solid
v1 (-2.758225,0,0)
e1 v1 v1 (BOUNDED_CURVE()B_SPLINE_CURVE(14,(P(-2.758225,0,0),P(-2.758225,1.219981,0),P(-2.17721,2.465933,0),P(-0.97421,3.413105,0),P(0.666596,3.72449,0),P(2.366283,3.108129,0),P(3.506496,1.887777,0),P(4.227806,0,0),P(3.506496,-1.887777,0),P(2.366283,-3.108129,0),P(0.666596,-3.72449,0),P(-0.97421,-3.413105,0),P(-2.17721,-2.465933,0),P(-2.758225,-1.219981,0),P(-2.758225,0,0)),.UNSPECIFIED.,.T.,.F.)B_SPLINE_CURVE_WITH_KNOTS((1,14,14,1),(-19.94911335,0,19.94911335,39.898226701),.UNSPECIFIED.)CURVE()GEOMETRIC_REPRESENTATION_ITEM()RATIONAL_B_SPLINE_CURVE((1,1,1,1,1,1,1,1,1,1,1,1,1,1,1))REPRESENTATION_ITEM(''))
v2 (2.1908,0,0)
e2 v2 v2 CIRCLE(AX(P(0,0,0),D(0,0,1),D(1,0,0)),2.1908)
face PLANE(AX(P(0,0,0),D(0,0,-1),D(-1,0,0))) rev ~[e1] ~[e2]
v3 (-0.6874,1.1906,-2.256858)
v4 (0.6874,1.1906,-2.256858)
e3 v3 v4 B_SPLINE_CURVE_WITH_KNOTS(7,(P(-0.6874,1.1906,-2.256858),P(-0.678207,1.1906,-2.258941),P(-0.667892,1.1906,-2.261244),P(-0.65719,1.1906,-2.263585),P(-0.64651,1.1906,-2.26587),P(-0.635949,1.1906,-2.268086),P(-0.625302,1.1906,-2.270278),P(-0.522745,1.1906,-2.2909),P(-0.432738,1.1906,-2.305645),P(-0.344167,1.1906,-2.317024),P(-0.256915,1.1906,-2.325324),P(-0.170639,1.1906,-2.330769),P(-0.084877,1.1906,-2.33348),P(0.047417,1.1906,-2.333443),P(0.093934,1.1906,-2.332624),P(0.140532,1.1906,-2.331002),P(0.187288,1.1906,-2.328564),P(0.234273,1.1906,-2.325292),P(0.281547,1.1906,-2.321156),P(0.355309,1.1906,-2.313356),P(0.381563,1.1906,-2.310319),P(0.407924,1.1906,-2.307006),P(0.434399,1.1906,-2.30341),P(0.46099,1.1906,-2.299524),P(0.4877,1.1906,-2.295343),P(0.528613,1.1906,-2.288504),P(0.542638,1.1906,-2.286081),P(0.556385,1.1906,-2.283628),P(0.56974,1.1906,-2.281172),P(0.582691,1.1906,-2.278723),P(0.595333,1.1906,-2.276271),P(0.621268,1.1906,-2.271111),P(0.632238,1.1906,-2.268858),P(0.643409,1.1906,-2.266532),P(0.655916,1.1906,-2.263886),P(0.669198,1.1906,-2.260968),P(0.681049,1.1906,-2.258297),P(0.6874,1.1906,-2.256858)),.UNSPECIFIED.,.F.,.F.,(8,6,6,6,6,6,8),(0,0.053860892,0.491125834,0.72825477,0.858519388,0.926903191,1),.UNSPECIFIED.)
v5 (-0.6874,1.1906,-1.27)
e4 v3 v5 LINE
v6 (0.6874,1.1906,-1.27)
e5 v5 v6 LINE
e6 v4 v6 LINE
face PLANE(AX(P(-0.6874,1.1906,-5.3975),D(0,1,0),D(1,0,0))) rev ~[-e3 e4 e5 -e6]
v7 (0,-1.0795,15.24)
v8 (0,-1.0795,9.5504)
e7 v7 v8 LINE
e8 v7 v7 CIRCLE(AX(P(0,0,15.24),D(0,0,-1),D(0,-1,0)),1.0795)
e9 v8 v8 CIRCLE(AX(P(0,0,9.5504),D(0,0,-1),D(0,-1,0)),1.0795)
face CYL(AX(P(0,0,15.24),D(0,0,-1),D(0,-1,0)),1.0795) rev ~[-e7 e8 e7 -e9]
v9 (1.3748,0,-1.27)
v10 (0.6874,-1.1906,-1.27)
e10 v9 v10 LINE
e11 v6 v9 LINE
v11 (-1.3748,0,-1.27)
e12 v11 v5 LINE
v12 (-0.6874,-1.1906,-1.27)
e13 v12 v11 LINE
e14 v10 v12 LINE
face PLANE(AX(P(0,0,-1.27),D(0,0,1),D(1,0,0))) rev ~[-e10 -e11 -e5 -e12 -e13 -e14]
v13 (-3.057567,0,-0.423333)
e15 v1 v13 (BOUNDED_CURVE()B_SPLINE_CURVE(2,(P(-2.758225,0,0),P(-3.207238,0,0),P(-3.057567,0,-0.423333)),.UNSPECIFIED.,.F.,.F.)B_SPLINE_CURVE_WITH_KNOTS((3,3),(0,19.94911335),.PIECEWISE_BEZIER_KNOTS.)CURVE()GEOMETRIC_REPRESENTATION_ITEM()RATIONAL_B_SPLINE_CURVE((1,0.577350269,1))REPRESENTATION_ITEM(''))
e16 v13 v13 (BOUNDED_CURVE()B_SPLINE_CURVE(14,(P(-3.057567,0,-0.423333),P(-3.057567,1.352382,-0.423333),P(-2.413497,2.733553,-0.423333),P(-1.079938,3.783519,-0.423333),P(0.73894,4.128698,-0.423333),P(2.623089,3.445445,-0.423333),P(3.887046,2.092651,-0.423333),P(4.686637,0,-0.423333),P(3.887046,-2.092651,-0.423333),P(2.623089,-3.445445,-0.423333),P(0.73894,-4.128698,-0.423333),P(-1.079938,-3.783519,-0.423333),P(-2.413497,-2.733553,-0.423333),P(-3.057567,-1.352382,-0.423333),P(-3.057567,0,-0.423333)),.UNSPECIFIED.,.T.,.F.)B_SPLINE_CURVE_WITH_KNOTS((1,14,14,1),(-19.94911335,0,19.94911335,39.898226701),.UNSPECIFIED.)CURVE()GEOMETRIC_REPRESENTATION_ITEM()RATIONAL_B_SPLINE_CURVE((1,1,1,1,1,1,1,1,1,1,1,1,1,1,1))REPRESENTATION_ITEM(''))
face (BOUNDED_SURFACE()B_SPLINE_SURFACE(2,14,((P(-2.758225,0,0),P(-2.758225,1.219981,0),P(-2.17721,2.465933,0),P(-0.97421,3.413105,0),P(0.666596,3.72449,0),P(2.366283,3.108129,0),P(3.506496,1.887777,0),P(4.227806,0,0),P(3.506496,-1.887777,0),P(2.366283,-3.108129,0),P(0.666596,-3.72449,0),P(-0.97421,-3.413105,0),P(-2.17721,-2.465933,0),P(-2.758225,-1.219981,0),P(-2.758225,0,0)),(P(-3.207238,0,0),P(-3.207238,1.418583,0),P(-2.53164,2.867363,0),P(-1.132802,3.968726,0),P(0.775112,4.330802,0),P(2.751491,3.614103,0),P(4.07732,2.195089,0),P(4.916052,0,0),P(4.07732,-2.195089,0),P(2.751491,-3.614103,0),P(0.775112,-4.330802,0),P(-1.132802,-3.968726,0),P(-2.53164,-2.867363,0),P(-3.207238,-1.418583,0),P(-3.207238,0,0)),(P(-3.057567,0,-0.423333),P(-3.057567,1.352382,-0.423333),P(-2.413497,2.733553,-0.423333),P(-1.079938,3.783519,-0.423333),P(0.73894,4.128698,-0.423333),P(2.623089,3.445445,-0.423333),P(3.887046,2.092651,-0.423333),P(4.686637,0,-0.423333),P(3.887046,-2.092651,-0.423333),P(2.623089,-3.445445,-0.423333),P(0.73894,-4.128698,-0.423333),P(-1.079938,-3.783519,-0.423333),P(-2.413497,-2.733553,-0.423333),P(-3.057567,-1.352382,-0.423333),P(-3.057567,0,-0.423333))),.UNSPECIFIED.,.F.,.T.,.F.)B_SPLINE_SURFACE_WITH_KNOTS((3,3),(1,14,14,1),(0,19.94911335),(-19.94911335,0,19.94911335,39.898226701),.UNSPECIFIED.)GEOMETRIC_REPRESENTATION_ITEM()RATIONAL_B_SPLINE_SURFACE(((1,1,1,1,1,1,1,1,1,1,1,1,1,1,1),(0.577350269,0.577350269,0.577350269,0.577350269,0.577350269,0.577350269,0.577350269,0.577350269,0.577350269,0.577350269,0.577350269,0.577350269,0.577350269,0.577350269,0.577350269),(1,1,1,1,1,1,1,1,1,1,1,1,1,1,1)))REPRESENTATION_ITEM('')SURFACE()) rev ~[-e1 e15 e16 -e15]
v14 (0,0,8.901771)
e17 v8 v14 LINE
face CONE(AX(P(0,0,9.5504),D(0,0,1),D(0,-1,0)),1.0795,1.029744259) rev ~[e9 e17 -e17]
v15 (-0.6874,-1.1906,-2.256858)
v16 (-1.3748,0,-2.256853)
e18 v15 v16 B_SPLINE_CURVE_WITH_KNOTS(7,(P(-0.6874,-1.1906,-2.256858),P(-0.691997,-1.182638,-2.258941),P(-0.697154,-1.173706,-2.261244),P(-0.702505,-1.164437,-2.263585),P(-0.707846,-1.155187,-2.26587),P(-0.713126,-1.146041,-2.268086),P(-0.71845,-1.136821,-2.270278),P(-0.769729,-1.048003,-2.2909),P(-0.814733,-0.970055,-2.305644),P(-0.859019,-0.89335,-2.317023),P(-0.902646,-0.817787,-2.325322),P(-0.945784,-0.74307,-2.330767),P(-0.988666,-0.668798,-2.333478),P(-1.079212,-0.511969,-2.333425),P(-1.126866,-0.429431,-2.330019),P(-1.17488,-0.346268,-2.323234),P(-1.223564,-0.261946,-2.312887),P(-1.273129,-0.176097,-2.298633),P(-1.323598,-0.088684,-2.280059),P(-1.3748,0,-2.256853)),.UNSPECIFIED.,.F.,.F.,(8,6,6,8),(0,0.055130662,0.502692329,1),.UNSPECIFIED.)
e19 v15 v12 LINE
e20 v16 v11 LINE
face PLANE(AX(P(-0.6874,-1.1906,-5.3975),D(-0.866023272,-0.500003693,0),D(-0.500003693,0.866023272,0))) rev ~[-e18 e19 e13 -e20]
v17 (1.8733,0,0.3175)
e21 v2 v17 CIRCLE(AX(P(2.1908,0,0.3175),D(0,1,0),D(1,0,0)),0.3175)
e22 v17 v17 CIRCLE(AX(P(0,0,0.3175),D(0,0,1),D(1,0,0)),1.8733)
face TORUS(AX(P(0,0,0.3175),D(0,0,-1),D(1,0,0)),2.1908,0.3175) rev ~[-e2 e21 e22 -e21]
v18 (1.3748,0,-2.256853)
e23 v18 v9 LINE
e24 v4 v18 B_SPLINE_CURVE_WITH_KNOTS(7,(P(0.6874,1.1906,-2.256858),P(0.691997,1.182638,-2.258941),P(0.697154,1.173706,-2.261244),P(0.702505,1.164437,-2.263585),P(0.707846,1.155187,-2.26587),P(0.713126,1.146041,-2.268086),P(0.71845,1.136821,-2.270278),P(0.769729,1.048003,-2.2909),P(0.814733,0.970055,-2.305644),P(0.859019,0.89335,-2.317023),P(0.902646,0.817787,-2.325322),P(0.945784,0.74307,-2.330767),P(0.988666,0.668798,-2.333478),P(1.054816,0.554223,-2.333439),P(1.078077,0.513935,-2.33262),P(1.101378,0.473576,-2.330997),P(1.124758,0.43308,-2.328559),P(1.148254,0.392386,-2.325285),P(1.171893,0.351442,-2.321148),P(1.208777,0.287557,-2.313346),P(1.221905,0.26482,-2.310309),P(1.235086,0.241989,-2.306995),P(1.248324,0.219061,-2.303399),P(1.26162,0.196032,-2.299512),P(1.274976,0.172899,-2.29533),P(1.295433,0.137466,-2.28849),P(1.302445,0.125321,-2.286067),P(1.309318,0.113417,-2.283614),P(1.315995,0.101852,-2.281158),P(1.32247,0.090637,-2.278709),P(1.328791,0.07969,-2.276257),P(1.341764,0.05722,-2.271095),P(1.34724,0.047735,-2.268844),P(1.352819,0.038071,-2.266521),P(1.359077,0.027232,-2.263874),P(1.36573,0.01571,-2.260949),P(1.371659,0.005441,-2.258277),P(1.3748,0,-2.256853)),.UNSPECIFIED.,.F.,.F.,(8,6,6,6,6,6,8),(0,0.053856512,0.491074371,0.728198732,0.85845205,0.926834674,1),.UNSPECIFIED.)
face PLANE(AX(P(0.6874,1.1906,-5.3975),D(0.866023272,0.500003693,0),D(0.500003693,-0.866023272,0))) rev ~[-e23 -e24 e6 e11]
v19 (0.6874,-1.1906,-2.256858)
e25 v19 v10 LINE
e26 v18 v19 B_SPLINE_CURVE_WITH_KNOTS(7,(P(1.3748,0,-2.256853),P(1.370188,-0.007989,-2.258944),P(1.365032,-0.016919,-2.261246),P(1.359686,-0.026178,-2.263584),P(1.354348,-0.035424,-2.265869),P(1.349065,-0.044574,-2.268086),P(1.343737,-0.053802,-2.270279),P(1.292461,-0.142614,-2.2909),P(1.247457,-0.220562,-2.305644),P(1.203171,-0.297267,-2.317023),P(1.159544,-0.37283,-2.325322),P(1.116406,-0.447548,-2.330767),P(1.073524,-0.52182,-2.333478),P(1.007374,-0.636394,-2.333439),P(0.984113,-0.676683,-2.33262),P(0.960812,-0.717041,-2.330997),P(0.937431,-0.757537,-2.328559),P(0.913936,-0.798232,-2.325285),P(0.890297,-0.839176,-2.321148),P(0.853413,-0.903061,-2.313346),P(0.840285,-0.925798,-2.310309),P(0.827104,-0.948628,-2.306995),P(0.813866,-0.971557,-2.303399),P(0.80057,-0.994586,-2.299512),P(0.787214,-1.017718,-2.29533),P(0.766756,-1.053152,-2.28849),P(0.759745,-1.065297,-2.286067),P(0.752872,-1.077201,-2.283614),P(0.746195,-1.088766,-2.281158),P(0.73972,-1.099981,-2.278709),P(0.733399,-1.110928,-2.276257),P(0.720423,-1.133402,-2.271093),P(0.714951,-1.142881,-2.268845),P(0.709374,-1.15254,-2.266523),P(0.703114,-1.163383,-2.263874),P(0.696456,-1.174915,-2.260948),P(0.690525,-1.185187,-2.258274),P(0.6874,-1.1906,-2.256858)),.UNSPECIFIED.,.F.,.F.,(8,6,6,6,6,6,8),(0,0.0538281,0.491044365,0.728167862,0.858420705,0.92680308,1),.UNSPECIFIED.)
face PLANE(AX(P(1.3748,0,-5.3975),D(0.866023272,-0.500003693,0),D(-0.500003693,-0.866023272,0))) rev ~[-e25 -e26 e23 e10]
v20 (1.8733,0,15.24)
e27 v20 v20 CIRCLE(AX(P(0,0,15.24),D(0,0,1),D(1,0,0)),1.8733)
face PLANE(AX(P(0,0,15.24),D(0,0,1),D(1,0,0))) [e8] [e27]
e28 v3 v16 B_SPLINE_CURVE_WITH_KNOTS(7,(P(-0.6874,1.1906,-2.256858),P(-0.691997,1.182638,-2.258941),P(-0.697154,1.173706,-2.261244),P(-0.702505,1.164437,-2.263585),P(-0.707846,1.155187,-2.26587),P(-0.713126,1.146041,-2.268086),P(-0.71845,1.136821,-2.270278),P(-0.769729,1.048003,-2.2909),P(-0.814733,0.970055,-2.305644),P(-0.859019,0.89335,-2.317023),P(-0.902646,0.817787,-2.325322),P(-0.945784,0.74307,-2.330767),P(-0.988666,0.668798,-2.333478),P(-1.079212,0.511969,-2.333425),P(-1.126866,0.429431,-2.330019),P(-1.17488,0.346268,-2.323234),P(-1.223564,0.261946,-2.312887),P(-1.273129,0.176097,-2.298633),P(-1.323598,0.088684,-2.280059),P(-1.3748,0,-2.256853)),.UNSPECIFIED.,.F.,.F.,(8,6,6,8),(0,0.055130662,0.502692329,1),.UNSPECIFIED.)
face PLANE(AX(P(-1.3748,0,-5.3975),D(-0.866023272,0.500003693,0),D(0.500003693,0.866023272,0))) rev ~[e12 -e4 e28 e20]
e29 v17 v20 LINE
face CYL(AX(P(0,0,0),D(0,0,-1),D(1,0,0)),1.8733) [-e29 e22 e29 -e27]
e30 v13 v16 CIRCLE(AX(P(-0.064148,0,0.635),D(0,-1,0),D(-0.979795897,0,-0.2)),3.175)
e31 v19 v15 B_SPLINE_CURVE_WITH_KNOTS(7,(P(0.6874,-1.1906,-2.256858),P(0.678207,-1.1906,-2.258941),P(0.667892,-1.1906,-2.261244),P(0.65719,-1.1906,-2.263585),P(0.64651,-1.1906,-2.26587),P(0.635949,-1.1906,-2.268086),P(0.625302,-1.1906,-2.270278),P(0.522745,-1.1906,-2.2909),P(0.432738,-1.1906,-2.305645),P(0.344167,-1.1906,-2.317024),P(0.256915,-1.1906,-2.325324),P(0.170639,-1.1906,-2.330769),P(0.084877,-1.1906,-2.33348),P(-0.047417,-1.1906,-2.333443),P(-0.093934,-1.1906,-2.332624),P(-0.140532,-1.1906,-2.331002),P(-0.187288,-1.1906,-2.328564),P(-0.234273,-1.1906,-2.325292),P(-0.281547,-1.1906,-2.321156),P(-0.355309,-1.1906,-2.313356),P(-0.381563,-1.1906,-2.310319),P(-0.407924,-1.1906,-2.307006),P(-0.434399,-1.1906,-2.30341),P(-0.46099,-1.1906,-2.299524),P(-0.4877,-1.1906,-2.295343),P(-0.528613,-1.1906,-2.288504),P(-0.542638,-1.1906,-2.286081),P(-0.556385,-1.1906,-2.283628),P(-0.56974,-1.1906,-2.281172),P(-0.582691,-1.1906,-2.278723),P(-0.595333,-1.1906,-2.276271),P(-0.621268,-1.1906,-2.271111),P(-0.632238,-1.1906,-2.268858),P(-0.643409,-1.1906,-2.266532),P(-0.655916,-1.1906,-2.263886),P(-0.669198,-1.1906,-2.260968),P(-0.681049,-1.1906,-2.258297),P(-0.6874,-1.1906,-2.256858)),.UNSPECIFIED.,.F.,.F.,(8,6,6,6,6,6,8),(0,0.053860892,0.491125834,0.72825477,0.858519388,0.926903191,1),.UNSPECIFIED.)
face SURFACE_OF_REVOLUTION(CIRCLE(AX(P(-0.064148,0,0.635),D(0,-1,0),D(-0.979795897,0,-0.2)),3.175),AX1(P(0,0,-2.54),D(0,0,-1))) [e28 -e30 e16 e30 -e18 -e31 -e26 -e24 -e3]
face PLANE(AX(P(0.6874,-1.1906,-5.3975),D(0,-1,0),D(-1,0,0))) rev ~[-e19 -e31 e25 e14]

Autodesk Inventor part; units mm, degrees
ref_plane "YZ Plane" through (0, 0, 0) normal (1, 0, 0) x (0, 1, 0)
ref_plane "XZ Plane" through (0, 0, 0) normal (0, 1, 0) x (-1, 0, 0)
sketch "Sketch1" plane through (0, 0, 0) normal (0, 0, 1) x (1, 0, 0)
  circle A0 centre (0, 0) radius 1.8733
  dimension "d0" = 3.7465
extrude "Extrusion1" add sketch "Sketch1" along normal blind 15.24
sketch "Sketch2" plane through (0, 0, 0) normal (0, 0, -1) x (-1, 0, 0)
  circle A0 centre (0, 0) radius 1.8732 projected
  circle A1 centre (0, 0) radius 3.175
  dimension "d3" = 6.35
extrude "Extrusion2" add sketch "Sketch2" along normal blind 2.54 contours A0 | A1
fillet "Fillet1" radius 3.175 1 edges at (3.175, 0, -2.54)
fillet "Fillet2" radius 0.3175 1 edges at (3.175, 0, 0)
fillet "Fillet3" radius 0.3175 1 edges at (-1.8733, 0, 0)
ref_plane "Work Plane1" through (0, 0, -5.3975) normal (0, 0, 1) x (1, 0, 0)
sketch "Sketch4" plane through (0, 0, -5.3975) normal (0, 0, 1) x (1, 0, 0)
  line L0 (1.3748, 0) -> (0.6874, -1.1906)
  line L1 (0.6874, -1.1906) -> (-0.6874, -1.1906)
  line L2 (-0.6874, -1.1906) -> (-1.3748, 0)
  line L3 (-1.3748, 0) -> (-0.6874, 1.1906)
  line L4 (-0.6874, 1.1906) -> (0.6874, 1.1906)
  line L5 (0.6874, 1.1906) -> (1.3748, 0)
  point P0 (0, 0)
  point P1 (0, 0)
  dimension "d19" = 2.3813
extrude "Extrusion3" cut sketch "Sketch4" along normal blind 4.1275
sketch "Sketch5" plane through (0, 0, 15.24) normal (0, 0, 1) x (1, 0, 0)
  point P0 (0, 0)
hole "Hole1" at (0, 0, 15.24) direction (0, 0, -1) diameter 2.159 depth 5.6896 tip angle 118
properties material "Stainless Steel"
